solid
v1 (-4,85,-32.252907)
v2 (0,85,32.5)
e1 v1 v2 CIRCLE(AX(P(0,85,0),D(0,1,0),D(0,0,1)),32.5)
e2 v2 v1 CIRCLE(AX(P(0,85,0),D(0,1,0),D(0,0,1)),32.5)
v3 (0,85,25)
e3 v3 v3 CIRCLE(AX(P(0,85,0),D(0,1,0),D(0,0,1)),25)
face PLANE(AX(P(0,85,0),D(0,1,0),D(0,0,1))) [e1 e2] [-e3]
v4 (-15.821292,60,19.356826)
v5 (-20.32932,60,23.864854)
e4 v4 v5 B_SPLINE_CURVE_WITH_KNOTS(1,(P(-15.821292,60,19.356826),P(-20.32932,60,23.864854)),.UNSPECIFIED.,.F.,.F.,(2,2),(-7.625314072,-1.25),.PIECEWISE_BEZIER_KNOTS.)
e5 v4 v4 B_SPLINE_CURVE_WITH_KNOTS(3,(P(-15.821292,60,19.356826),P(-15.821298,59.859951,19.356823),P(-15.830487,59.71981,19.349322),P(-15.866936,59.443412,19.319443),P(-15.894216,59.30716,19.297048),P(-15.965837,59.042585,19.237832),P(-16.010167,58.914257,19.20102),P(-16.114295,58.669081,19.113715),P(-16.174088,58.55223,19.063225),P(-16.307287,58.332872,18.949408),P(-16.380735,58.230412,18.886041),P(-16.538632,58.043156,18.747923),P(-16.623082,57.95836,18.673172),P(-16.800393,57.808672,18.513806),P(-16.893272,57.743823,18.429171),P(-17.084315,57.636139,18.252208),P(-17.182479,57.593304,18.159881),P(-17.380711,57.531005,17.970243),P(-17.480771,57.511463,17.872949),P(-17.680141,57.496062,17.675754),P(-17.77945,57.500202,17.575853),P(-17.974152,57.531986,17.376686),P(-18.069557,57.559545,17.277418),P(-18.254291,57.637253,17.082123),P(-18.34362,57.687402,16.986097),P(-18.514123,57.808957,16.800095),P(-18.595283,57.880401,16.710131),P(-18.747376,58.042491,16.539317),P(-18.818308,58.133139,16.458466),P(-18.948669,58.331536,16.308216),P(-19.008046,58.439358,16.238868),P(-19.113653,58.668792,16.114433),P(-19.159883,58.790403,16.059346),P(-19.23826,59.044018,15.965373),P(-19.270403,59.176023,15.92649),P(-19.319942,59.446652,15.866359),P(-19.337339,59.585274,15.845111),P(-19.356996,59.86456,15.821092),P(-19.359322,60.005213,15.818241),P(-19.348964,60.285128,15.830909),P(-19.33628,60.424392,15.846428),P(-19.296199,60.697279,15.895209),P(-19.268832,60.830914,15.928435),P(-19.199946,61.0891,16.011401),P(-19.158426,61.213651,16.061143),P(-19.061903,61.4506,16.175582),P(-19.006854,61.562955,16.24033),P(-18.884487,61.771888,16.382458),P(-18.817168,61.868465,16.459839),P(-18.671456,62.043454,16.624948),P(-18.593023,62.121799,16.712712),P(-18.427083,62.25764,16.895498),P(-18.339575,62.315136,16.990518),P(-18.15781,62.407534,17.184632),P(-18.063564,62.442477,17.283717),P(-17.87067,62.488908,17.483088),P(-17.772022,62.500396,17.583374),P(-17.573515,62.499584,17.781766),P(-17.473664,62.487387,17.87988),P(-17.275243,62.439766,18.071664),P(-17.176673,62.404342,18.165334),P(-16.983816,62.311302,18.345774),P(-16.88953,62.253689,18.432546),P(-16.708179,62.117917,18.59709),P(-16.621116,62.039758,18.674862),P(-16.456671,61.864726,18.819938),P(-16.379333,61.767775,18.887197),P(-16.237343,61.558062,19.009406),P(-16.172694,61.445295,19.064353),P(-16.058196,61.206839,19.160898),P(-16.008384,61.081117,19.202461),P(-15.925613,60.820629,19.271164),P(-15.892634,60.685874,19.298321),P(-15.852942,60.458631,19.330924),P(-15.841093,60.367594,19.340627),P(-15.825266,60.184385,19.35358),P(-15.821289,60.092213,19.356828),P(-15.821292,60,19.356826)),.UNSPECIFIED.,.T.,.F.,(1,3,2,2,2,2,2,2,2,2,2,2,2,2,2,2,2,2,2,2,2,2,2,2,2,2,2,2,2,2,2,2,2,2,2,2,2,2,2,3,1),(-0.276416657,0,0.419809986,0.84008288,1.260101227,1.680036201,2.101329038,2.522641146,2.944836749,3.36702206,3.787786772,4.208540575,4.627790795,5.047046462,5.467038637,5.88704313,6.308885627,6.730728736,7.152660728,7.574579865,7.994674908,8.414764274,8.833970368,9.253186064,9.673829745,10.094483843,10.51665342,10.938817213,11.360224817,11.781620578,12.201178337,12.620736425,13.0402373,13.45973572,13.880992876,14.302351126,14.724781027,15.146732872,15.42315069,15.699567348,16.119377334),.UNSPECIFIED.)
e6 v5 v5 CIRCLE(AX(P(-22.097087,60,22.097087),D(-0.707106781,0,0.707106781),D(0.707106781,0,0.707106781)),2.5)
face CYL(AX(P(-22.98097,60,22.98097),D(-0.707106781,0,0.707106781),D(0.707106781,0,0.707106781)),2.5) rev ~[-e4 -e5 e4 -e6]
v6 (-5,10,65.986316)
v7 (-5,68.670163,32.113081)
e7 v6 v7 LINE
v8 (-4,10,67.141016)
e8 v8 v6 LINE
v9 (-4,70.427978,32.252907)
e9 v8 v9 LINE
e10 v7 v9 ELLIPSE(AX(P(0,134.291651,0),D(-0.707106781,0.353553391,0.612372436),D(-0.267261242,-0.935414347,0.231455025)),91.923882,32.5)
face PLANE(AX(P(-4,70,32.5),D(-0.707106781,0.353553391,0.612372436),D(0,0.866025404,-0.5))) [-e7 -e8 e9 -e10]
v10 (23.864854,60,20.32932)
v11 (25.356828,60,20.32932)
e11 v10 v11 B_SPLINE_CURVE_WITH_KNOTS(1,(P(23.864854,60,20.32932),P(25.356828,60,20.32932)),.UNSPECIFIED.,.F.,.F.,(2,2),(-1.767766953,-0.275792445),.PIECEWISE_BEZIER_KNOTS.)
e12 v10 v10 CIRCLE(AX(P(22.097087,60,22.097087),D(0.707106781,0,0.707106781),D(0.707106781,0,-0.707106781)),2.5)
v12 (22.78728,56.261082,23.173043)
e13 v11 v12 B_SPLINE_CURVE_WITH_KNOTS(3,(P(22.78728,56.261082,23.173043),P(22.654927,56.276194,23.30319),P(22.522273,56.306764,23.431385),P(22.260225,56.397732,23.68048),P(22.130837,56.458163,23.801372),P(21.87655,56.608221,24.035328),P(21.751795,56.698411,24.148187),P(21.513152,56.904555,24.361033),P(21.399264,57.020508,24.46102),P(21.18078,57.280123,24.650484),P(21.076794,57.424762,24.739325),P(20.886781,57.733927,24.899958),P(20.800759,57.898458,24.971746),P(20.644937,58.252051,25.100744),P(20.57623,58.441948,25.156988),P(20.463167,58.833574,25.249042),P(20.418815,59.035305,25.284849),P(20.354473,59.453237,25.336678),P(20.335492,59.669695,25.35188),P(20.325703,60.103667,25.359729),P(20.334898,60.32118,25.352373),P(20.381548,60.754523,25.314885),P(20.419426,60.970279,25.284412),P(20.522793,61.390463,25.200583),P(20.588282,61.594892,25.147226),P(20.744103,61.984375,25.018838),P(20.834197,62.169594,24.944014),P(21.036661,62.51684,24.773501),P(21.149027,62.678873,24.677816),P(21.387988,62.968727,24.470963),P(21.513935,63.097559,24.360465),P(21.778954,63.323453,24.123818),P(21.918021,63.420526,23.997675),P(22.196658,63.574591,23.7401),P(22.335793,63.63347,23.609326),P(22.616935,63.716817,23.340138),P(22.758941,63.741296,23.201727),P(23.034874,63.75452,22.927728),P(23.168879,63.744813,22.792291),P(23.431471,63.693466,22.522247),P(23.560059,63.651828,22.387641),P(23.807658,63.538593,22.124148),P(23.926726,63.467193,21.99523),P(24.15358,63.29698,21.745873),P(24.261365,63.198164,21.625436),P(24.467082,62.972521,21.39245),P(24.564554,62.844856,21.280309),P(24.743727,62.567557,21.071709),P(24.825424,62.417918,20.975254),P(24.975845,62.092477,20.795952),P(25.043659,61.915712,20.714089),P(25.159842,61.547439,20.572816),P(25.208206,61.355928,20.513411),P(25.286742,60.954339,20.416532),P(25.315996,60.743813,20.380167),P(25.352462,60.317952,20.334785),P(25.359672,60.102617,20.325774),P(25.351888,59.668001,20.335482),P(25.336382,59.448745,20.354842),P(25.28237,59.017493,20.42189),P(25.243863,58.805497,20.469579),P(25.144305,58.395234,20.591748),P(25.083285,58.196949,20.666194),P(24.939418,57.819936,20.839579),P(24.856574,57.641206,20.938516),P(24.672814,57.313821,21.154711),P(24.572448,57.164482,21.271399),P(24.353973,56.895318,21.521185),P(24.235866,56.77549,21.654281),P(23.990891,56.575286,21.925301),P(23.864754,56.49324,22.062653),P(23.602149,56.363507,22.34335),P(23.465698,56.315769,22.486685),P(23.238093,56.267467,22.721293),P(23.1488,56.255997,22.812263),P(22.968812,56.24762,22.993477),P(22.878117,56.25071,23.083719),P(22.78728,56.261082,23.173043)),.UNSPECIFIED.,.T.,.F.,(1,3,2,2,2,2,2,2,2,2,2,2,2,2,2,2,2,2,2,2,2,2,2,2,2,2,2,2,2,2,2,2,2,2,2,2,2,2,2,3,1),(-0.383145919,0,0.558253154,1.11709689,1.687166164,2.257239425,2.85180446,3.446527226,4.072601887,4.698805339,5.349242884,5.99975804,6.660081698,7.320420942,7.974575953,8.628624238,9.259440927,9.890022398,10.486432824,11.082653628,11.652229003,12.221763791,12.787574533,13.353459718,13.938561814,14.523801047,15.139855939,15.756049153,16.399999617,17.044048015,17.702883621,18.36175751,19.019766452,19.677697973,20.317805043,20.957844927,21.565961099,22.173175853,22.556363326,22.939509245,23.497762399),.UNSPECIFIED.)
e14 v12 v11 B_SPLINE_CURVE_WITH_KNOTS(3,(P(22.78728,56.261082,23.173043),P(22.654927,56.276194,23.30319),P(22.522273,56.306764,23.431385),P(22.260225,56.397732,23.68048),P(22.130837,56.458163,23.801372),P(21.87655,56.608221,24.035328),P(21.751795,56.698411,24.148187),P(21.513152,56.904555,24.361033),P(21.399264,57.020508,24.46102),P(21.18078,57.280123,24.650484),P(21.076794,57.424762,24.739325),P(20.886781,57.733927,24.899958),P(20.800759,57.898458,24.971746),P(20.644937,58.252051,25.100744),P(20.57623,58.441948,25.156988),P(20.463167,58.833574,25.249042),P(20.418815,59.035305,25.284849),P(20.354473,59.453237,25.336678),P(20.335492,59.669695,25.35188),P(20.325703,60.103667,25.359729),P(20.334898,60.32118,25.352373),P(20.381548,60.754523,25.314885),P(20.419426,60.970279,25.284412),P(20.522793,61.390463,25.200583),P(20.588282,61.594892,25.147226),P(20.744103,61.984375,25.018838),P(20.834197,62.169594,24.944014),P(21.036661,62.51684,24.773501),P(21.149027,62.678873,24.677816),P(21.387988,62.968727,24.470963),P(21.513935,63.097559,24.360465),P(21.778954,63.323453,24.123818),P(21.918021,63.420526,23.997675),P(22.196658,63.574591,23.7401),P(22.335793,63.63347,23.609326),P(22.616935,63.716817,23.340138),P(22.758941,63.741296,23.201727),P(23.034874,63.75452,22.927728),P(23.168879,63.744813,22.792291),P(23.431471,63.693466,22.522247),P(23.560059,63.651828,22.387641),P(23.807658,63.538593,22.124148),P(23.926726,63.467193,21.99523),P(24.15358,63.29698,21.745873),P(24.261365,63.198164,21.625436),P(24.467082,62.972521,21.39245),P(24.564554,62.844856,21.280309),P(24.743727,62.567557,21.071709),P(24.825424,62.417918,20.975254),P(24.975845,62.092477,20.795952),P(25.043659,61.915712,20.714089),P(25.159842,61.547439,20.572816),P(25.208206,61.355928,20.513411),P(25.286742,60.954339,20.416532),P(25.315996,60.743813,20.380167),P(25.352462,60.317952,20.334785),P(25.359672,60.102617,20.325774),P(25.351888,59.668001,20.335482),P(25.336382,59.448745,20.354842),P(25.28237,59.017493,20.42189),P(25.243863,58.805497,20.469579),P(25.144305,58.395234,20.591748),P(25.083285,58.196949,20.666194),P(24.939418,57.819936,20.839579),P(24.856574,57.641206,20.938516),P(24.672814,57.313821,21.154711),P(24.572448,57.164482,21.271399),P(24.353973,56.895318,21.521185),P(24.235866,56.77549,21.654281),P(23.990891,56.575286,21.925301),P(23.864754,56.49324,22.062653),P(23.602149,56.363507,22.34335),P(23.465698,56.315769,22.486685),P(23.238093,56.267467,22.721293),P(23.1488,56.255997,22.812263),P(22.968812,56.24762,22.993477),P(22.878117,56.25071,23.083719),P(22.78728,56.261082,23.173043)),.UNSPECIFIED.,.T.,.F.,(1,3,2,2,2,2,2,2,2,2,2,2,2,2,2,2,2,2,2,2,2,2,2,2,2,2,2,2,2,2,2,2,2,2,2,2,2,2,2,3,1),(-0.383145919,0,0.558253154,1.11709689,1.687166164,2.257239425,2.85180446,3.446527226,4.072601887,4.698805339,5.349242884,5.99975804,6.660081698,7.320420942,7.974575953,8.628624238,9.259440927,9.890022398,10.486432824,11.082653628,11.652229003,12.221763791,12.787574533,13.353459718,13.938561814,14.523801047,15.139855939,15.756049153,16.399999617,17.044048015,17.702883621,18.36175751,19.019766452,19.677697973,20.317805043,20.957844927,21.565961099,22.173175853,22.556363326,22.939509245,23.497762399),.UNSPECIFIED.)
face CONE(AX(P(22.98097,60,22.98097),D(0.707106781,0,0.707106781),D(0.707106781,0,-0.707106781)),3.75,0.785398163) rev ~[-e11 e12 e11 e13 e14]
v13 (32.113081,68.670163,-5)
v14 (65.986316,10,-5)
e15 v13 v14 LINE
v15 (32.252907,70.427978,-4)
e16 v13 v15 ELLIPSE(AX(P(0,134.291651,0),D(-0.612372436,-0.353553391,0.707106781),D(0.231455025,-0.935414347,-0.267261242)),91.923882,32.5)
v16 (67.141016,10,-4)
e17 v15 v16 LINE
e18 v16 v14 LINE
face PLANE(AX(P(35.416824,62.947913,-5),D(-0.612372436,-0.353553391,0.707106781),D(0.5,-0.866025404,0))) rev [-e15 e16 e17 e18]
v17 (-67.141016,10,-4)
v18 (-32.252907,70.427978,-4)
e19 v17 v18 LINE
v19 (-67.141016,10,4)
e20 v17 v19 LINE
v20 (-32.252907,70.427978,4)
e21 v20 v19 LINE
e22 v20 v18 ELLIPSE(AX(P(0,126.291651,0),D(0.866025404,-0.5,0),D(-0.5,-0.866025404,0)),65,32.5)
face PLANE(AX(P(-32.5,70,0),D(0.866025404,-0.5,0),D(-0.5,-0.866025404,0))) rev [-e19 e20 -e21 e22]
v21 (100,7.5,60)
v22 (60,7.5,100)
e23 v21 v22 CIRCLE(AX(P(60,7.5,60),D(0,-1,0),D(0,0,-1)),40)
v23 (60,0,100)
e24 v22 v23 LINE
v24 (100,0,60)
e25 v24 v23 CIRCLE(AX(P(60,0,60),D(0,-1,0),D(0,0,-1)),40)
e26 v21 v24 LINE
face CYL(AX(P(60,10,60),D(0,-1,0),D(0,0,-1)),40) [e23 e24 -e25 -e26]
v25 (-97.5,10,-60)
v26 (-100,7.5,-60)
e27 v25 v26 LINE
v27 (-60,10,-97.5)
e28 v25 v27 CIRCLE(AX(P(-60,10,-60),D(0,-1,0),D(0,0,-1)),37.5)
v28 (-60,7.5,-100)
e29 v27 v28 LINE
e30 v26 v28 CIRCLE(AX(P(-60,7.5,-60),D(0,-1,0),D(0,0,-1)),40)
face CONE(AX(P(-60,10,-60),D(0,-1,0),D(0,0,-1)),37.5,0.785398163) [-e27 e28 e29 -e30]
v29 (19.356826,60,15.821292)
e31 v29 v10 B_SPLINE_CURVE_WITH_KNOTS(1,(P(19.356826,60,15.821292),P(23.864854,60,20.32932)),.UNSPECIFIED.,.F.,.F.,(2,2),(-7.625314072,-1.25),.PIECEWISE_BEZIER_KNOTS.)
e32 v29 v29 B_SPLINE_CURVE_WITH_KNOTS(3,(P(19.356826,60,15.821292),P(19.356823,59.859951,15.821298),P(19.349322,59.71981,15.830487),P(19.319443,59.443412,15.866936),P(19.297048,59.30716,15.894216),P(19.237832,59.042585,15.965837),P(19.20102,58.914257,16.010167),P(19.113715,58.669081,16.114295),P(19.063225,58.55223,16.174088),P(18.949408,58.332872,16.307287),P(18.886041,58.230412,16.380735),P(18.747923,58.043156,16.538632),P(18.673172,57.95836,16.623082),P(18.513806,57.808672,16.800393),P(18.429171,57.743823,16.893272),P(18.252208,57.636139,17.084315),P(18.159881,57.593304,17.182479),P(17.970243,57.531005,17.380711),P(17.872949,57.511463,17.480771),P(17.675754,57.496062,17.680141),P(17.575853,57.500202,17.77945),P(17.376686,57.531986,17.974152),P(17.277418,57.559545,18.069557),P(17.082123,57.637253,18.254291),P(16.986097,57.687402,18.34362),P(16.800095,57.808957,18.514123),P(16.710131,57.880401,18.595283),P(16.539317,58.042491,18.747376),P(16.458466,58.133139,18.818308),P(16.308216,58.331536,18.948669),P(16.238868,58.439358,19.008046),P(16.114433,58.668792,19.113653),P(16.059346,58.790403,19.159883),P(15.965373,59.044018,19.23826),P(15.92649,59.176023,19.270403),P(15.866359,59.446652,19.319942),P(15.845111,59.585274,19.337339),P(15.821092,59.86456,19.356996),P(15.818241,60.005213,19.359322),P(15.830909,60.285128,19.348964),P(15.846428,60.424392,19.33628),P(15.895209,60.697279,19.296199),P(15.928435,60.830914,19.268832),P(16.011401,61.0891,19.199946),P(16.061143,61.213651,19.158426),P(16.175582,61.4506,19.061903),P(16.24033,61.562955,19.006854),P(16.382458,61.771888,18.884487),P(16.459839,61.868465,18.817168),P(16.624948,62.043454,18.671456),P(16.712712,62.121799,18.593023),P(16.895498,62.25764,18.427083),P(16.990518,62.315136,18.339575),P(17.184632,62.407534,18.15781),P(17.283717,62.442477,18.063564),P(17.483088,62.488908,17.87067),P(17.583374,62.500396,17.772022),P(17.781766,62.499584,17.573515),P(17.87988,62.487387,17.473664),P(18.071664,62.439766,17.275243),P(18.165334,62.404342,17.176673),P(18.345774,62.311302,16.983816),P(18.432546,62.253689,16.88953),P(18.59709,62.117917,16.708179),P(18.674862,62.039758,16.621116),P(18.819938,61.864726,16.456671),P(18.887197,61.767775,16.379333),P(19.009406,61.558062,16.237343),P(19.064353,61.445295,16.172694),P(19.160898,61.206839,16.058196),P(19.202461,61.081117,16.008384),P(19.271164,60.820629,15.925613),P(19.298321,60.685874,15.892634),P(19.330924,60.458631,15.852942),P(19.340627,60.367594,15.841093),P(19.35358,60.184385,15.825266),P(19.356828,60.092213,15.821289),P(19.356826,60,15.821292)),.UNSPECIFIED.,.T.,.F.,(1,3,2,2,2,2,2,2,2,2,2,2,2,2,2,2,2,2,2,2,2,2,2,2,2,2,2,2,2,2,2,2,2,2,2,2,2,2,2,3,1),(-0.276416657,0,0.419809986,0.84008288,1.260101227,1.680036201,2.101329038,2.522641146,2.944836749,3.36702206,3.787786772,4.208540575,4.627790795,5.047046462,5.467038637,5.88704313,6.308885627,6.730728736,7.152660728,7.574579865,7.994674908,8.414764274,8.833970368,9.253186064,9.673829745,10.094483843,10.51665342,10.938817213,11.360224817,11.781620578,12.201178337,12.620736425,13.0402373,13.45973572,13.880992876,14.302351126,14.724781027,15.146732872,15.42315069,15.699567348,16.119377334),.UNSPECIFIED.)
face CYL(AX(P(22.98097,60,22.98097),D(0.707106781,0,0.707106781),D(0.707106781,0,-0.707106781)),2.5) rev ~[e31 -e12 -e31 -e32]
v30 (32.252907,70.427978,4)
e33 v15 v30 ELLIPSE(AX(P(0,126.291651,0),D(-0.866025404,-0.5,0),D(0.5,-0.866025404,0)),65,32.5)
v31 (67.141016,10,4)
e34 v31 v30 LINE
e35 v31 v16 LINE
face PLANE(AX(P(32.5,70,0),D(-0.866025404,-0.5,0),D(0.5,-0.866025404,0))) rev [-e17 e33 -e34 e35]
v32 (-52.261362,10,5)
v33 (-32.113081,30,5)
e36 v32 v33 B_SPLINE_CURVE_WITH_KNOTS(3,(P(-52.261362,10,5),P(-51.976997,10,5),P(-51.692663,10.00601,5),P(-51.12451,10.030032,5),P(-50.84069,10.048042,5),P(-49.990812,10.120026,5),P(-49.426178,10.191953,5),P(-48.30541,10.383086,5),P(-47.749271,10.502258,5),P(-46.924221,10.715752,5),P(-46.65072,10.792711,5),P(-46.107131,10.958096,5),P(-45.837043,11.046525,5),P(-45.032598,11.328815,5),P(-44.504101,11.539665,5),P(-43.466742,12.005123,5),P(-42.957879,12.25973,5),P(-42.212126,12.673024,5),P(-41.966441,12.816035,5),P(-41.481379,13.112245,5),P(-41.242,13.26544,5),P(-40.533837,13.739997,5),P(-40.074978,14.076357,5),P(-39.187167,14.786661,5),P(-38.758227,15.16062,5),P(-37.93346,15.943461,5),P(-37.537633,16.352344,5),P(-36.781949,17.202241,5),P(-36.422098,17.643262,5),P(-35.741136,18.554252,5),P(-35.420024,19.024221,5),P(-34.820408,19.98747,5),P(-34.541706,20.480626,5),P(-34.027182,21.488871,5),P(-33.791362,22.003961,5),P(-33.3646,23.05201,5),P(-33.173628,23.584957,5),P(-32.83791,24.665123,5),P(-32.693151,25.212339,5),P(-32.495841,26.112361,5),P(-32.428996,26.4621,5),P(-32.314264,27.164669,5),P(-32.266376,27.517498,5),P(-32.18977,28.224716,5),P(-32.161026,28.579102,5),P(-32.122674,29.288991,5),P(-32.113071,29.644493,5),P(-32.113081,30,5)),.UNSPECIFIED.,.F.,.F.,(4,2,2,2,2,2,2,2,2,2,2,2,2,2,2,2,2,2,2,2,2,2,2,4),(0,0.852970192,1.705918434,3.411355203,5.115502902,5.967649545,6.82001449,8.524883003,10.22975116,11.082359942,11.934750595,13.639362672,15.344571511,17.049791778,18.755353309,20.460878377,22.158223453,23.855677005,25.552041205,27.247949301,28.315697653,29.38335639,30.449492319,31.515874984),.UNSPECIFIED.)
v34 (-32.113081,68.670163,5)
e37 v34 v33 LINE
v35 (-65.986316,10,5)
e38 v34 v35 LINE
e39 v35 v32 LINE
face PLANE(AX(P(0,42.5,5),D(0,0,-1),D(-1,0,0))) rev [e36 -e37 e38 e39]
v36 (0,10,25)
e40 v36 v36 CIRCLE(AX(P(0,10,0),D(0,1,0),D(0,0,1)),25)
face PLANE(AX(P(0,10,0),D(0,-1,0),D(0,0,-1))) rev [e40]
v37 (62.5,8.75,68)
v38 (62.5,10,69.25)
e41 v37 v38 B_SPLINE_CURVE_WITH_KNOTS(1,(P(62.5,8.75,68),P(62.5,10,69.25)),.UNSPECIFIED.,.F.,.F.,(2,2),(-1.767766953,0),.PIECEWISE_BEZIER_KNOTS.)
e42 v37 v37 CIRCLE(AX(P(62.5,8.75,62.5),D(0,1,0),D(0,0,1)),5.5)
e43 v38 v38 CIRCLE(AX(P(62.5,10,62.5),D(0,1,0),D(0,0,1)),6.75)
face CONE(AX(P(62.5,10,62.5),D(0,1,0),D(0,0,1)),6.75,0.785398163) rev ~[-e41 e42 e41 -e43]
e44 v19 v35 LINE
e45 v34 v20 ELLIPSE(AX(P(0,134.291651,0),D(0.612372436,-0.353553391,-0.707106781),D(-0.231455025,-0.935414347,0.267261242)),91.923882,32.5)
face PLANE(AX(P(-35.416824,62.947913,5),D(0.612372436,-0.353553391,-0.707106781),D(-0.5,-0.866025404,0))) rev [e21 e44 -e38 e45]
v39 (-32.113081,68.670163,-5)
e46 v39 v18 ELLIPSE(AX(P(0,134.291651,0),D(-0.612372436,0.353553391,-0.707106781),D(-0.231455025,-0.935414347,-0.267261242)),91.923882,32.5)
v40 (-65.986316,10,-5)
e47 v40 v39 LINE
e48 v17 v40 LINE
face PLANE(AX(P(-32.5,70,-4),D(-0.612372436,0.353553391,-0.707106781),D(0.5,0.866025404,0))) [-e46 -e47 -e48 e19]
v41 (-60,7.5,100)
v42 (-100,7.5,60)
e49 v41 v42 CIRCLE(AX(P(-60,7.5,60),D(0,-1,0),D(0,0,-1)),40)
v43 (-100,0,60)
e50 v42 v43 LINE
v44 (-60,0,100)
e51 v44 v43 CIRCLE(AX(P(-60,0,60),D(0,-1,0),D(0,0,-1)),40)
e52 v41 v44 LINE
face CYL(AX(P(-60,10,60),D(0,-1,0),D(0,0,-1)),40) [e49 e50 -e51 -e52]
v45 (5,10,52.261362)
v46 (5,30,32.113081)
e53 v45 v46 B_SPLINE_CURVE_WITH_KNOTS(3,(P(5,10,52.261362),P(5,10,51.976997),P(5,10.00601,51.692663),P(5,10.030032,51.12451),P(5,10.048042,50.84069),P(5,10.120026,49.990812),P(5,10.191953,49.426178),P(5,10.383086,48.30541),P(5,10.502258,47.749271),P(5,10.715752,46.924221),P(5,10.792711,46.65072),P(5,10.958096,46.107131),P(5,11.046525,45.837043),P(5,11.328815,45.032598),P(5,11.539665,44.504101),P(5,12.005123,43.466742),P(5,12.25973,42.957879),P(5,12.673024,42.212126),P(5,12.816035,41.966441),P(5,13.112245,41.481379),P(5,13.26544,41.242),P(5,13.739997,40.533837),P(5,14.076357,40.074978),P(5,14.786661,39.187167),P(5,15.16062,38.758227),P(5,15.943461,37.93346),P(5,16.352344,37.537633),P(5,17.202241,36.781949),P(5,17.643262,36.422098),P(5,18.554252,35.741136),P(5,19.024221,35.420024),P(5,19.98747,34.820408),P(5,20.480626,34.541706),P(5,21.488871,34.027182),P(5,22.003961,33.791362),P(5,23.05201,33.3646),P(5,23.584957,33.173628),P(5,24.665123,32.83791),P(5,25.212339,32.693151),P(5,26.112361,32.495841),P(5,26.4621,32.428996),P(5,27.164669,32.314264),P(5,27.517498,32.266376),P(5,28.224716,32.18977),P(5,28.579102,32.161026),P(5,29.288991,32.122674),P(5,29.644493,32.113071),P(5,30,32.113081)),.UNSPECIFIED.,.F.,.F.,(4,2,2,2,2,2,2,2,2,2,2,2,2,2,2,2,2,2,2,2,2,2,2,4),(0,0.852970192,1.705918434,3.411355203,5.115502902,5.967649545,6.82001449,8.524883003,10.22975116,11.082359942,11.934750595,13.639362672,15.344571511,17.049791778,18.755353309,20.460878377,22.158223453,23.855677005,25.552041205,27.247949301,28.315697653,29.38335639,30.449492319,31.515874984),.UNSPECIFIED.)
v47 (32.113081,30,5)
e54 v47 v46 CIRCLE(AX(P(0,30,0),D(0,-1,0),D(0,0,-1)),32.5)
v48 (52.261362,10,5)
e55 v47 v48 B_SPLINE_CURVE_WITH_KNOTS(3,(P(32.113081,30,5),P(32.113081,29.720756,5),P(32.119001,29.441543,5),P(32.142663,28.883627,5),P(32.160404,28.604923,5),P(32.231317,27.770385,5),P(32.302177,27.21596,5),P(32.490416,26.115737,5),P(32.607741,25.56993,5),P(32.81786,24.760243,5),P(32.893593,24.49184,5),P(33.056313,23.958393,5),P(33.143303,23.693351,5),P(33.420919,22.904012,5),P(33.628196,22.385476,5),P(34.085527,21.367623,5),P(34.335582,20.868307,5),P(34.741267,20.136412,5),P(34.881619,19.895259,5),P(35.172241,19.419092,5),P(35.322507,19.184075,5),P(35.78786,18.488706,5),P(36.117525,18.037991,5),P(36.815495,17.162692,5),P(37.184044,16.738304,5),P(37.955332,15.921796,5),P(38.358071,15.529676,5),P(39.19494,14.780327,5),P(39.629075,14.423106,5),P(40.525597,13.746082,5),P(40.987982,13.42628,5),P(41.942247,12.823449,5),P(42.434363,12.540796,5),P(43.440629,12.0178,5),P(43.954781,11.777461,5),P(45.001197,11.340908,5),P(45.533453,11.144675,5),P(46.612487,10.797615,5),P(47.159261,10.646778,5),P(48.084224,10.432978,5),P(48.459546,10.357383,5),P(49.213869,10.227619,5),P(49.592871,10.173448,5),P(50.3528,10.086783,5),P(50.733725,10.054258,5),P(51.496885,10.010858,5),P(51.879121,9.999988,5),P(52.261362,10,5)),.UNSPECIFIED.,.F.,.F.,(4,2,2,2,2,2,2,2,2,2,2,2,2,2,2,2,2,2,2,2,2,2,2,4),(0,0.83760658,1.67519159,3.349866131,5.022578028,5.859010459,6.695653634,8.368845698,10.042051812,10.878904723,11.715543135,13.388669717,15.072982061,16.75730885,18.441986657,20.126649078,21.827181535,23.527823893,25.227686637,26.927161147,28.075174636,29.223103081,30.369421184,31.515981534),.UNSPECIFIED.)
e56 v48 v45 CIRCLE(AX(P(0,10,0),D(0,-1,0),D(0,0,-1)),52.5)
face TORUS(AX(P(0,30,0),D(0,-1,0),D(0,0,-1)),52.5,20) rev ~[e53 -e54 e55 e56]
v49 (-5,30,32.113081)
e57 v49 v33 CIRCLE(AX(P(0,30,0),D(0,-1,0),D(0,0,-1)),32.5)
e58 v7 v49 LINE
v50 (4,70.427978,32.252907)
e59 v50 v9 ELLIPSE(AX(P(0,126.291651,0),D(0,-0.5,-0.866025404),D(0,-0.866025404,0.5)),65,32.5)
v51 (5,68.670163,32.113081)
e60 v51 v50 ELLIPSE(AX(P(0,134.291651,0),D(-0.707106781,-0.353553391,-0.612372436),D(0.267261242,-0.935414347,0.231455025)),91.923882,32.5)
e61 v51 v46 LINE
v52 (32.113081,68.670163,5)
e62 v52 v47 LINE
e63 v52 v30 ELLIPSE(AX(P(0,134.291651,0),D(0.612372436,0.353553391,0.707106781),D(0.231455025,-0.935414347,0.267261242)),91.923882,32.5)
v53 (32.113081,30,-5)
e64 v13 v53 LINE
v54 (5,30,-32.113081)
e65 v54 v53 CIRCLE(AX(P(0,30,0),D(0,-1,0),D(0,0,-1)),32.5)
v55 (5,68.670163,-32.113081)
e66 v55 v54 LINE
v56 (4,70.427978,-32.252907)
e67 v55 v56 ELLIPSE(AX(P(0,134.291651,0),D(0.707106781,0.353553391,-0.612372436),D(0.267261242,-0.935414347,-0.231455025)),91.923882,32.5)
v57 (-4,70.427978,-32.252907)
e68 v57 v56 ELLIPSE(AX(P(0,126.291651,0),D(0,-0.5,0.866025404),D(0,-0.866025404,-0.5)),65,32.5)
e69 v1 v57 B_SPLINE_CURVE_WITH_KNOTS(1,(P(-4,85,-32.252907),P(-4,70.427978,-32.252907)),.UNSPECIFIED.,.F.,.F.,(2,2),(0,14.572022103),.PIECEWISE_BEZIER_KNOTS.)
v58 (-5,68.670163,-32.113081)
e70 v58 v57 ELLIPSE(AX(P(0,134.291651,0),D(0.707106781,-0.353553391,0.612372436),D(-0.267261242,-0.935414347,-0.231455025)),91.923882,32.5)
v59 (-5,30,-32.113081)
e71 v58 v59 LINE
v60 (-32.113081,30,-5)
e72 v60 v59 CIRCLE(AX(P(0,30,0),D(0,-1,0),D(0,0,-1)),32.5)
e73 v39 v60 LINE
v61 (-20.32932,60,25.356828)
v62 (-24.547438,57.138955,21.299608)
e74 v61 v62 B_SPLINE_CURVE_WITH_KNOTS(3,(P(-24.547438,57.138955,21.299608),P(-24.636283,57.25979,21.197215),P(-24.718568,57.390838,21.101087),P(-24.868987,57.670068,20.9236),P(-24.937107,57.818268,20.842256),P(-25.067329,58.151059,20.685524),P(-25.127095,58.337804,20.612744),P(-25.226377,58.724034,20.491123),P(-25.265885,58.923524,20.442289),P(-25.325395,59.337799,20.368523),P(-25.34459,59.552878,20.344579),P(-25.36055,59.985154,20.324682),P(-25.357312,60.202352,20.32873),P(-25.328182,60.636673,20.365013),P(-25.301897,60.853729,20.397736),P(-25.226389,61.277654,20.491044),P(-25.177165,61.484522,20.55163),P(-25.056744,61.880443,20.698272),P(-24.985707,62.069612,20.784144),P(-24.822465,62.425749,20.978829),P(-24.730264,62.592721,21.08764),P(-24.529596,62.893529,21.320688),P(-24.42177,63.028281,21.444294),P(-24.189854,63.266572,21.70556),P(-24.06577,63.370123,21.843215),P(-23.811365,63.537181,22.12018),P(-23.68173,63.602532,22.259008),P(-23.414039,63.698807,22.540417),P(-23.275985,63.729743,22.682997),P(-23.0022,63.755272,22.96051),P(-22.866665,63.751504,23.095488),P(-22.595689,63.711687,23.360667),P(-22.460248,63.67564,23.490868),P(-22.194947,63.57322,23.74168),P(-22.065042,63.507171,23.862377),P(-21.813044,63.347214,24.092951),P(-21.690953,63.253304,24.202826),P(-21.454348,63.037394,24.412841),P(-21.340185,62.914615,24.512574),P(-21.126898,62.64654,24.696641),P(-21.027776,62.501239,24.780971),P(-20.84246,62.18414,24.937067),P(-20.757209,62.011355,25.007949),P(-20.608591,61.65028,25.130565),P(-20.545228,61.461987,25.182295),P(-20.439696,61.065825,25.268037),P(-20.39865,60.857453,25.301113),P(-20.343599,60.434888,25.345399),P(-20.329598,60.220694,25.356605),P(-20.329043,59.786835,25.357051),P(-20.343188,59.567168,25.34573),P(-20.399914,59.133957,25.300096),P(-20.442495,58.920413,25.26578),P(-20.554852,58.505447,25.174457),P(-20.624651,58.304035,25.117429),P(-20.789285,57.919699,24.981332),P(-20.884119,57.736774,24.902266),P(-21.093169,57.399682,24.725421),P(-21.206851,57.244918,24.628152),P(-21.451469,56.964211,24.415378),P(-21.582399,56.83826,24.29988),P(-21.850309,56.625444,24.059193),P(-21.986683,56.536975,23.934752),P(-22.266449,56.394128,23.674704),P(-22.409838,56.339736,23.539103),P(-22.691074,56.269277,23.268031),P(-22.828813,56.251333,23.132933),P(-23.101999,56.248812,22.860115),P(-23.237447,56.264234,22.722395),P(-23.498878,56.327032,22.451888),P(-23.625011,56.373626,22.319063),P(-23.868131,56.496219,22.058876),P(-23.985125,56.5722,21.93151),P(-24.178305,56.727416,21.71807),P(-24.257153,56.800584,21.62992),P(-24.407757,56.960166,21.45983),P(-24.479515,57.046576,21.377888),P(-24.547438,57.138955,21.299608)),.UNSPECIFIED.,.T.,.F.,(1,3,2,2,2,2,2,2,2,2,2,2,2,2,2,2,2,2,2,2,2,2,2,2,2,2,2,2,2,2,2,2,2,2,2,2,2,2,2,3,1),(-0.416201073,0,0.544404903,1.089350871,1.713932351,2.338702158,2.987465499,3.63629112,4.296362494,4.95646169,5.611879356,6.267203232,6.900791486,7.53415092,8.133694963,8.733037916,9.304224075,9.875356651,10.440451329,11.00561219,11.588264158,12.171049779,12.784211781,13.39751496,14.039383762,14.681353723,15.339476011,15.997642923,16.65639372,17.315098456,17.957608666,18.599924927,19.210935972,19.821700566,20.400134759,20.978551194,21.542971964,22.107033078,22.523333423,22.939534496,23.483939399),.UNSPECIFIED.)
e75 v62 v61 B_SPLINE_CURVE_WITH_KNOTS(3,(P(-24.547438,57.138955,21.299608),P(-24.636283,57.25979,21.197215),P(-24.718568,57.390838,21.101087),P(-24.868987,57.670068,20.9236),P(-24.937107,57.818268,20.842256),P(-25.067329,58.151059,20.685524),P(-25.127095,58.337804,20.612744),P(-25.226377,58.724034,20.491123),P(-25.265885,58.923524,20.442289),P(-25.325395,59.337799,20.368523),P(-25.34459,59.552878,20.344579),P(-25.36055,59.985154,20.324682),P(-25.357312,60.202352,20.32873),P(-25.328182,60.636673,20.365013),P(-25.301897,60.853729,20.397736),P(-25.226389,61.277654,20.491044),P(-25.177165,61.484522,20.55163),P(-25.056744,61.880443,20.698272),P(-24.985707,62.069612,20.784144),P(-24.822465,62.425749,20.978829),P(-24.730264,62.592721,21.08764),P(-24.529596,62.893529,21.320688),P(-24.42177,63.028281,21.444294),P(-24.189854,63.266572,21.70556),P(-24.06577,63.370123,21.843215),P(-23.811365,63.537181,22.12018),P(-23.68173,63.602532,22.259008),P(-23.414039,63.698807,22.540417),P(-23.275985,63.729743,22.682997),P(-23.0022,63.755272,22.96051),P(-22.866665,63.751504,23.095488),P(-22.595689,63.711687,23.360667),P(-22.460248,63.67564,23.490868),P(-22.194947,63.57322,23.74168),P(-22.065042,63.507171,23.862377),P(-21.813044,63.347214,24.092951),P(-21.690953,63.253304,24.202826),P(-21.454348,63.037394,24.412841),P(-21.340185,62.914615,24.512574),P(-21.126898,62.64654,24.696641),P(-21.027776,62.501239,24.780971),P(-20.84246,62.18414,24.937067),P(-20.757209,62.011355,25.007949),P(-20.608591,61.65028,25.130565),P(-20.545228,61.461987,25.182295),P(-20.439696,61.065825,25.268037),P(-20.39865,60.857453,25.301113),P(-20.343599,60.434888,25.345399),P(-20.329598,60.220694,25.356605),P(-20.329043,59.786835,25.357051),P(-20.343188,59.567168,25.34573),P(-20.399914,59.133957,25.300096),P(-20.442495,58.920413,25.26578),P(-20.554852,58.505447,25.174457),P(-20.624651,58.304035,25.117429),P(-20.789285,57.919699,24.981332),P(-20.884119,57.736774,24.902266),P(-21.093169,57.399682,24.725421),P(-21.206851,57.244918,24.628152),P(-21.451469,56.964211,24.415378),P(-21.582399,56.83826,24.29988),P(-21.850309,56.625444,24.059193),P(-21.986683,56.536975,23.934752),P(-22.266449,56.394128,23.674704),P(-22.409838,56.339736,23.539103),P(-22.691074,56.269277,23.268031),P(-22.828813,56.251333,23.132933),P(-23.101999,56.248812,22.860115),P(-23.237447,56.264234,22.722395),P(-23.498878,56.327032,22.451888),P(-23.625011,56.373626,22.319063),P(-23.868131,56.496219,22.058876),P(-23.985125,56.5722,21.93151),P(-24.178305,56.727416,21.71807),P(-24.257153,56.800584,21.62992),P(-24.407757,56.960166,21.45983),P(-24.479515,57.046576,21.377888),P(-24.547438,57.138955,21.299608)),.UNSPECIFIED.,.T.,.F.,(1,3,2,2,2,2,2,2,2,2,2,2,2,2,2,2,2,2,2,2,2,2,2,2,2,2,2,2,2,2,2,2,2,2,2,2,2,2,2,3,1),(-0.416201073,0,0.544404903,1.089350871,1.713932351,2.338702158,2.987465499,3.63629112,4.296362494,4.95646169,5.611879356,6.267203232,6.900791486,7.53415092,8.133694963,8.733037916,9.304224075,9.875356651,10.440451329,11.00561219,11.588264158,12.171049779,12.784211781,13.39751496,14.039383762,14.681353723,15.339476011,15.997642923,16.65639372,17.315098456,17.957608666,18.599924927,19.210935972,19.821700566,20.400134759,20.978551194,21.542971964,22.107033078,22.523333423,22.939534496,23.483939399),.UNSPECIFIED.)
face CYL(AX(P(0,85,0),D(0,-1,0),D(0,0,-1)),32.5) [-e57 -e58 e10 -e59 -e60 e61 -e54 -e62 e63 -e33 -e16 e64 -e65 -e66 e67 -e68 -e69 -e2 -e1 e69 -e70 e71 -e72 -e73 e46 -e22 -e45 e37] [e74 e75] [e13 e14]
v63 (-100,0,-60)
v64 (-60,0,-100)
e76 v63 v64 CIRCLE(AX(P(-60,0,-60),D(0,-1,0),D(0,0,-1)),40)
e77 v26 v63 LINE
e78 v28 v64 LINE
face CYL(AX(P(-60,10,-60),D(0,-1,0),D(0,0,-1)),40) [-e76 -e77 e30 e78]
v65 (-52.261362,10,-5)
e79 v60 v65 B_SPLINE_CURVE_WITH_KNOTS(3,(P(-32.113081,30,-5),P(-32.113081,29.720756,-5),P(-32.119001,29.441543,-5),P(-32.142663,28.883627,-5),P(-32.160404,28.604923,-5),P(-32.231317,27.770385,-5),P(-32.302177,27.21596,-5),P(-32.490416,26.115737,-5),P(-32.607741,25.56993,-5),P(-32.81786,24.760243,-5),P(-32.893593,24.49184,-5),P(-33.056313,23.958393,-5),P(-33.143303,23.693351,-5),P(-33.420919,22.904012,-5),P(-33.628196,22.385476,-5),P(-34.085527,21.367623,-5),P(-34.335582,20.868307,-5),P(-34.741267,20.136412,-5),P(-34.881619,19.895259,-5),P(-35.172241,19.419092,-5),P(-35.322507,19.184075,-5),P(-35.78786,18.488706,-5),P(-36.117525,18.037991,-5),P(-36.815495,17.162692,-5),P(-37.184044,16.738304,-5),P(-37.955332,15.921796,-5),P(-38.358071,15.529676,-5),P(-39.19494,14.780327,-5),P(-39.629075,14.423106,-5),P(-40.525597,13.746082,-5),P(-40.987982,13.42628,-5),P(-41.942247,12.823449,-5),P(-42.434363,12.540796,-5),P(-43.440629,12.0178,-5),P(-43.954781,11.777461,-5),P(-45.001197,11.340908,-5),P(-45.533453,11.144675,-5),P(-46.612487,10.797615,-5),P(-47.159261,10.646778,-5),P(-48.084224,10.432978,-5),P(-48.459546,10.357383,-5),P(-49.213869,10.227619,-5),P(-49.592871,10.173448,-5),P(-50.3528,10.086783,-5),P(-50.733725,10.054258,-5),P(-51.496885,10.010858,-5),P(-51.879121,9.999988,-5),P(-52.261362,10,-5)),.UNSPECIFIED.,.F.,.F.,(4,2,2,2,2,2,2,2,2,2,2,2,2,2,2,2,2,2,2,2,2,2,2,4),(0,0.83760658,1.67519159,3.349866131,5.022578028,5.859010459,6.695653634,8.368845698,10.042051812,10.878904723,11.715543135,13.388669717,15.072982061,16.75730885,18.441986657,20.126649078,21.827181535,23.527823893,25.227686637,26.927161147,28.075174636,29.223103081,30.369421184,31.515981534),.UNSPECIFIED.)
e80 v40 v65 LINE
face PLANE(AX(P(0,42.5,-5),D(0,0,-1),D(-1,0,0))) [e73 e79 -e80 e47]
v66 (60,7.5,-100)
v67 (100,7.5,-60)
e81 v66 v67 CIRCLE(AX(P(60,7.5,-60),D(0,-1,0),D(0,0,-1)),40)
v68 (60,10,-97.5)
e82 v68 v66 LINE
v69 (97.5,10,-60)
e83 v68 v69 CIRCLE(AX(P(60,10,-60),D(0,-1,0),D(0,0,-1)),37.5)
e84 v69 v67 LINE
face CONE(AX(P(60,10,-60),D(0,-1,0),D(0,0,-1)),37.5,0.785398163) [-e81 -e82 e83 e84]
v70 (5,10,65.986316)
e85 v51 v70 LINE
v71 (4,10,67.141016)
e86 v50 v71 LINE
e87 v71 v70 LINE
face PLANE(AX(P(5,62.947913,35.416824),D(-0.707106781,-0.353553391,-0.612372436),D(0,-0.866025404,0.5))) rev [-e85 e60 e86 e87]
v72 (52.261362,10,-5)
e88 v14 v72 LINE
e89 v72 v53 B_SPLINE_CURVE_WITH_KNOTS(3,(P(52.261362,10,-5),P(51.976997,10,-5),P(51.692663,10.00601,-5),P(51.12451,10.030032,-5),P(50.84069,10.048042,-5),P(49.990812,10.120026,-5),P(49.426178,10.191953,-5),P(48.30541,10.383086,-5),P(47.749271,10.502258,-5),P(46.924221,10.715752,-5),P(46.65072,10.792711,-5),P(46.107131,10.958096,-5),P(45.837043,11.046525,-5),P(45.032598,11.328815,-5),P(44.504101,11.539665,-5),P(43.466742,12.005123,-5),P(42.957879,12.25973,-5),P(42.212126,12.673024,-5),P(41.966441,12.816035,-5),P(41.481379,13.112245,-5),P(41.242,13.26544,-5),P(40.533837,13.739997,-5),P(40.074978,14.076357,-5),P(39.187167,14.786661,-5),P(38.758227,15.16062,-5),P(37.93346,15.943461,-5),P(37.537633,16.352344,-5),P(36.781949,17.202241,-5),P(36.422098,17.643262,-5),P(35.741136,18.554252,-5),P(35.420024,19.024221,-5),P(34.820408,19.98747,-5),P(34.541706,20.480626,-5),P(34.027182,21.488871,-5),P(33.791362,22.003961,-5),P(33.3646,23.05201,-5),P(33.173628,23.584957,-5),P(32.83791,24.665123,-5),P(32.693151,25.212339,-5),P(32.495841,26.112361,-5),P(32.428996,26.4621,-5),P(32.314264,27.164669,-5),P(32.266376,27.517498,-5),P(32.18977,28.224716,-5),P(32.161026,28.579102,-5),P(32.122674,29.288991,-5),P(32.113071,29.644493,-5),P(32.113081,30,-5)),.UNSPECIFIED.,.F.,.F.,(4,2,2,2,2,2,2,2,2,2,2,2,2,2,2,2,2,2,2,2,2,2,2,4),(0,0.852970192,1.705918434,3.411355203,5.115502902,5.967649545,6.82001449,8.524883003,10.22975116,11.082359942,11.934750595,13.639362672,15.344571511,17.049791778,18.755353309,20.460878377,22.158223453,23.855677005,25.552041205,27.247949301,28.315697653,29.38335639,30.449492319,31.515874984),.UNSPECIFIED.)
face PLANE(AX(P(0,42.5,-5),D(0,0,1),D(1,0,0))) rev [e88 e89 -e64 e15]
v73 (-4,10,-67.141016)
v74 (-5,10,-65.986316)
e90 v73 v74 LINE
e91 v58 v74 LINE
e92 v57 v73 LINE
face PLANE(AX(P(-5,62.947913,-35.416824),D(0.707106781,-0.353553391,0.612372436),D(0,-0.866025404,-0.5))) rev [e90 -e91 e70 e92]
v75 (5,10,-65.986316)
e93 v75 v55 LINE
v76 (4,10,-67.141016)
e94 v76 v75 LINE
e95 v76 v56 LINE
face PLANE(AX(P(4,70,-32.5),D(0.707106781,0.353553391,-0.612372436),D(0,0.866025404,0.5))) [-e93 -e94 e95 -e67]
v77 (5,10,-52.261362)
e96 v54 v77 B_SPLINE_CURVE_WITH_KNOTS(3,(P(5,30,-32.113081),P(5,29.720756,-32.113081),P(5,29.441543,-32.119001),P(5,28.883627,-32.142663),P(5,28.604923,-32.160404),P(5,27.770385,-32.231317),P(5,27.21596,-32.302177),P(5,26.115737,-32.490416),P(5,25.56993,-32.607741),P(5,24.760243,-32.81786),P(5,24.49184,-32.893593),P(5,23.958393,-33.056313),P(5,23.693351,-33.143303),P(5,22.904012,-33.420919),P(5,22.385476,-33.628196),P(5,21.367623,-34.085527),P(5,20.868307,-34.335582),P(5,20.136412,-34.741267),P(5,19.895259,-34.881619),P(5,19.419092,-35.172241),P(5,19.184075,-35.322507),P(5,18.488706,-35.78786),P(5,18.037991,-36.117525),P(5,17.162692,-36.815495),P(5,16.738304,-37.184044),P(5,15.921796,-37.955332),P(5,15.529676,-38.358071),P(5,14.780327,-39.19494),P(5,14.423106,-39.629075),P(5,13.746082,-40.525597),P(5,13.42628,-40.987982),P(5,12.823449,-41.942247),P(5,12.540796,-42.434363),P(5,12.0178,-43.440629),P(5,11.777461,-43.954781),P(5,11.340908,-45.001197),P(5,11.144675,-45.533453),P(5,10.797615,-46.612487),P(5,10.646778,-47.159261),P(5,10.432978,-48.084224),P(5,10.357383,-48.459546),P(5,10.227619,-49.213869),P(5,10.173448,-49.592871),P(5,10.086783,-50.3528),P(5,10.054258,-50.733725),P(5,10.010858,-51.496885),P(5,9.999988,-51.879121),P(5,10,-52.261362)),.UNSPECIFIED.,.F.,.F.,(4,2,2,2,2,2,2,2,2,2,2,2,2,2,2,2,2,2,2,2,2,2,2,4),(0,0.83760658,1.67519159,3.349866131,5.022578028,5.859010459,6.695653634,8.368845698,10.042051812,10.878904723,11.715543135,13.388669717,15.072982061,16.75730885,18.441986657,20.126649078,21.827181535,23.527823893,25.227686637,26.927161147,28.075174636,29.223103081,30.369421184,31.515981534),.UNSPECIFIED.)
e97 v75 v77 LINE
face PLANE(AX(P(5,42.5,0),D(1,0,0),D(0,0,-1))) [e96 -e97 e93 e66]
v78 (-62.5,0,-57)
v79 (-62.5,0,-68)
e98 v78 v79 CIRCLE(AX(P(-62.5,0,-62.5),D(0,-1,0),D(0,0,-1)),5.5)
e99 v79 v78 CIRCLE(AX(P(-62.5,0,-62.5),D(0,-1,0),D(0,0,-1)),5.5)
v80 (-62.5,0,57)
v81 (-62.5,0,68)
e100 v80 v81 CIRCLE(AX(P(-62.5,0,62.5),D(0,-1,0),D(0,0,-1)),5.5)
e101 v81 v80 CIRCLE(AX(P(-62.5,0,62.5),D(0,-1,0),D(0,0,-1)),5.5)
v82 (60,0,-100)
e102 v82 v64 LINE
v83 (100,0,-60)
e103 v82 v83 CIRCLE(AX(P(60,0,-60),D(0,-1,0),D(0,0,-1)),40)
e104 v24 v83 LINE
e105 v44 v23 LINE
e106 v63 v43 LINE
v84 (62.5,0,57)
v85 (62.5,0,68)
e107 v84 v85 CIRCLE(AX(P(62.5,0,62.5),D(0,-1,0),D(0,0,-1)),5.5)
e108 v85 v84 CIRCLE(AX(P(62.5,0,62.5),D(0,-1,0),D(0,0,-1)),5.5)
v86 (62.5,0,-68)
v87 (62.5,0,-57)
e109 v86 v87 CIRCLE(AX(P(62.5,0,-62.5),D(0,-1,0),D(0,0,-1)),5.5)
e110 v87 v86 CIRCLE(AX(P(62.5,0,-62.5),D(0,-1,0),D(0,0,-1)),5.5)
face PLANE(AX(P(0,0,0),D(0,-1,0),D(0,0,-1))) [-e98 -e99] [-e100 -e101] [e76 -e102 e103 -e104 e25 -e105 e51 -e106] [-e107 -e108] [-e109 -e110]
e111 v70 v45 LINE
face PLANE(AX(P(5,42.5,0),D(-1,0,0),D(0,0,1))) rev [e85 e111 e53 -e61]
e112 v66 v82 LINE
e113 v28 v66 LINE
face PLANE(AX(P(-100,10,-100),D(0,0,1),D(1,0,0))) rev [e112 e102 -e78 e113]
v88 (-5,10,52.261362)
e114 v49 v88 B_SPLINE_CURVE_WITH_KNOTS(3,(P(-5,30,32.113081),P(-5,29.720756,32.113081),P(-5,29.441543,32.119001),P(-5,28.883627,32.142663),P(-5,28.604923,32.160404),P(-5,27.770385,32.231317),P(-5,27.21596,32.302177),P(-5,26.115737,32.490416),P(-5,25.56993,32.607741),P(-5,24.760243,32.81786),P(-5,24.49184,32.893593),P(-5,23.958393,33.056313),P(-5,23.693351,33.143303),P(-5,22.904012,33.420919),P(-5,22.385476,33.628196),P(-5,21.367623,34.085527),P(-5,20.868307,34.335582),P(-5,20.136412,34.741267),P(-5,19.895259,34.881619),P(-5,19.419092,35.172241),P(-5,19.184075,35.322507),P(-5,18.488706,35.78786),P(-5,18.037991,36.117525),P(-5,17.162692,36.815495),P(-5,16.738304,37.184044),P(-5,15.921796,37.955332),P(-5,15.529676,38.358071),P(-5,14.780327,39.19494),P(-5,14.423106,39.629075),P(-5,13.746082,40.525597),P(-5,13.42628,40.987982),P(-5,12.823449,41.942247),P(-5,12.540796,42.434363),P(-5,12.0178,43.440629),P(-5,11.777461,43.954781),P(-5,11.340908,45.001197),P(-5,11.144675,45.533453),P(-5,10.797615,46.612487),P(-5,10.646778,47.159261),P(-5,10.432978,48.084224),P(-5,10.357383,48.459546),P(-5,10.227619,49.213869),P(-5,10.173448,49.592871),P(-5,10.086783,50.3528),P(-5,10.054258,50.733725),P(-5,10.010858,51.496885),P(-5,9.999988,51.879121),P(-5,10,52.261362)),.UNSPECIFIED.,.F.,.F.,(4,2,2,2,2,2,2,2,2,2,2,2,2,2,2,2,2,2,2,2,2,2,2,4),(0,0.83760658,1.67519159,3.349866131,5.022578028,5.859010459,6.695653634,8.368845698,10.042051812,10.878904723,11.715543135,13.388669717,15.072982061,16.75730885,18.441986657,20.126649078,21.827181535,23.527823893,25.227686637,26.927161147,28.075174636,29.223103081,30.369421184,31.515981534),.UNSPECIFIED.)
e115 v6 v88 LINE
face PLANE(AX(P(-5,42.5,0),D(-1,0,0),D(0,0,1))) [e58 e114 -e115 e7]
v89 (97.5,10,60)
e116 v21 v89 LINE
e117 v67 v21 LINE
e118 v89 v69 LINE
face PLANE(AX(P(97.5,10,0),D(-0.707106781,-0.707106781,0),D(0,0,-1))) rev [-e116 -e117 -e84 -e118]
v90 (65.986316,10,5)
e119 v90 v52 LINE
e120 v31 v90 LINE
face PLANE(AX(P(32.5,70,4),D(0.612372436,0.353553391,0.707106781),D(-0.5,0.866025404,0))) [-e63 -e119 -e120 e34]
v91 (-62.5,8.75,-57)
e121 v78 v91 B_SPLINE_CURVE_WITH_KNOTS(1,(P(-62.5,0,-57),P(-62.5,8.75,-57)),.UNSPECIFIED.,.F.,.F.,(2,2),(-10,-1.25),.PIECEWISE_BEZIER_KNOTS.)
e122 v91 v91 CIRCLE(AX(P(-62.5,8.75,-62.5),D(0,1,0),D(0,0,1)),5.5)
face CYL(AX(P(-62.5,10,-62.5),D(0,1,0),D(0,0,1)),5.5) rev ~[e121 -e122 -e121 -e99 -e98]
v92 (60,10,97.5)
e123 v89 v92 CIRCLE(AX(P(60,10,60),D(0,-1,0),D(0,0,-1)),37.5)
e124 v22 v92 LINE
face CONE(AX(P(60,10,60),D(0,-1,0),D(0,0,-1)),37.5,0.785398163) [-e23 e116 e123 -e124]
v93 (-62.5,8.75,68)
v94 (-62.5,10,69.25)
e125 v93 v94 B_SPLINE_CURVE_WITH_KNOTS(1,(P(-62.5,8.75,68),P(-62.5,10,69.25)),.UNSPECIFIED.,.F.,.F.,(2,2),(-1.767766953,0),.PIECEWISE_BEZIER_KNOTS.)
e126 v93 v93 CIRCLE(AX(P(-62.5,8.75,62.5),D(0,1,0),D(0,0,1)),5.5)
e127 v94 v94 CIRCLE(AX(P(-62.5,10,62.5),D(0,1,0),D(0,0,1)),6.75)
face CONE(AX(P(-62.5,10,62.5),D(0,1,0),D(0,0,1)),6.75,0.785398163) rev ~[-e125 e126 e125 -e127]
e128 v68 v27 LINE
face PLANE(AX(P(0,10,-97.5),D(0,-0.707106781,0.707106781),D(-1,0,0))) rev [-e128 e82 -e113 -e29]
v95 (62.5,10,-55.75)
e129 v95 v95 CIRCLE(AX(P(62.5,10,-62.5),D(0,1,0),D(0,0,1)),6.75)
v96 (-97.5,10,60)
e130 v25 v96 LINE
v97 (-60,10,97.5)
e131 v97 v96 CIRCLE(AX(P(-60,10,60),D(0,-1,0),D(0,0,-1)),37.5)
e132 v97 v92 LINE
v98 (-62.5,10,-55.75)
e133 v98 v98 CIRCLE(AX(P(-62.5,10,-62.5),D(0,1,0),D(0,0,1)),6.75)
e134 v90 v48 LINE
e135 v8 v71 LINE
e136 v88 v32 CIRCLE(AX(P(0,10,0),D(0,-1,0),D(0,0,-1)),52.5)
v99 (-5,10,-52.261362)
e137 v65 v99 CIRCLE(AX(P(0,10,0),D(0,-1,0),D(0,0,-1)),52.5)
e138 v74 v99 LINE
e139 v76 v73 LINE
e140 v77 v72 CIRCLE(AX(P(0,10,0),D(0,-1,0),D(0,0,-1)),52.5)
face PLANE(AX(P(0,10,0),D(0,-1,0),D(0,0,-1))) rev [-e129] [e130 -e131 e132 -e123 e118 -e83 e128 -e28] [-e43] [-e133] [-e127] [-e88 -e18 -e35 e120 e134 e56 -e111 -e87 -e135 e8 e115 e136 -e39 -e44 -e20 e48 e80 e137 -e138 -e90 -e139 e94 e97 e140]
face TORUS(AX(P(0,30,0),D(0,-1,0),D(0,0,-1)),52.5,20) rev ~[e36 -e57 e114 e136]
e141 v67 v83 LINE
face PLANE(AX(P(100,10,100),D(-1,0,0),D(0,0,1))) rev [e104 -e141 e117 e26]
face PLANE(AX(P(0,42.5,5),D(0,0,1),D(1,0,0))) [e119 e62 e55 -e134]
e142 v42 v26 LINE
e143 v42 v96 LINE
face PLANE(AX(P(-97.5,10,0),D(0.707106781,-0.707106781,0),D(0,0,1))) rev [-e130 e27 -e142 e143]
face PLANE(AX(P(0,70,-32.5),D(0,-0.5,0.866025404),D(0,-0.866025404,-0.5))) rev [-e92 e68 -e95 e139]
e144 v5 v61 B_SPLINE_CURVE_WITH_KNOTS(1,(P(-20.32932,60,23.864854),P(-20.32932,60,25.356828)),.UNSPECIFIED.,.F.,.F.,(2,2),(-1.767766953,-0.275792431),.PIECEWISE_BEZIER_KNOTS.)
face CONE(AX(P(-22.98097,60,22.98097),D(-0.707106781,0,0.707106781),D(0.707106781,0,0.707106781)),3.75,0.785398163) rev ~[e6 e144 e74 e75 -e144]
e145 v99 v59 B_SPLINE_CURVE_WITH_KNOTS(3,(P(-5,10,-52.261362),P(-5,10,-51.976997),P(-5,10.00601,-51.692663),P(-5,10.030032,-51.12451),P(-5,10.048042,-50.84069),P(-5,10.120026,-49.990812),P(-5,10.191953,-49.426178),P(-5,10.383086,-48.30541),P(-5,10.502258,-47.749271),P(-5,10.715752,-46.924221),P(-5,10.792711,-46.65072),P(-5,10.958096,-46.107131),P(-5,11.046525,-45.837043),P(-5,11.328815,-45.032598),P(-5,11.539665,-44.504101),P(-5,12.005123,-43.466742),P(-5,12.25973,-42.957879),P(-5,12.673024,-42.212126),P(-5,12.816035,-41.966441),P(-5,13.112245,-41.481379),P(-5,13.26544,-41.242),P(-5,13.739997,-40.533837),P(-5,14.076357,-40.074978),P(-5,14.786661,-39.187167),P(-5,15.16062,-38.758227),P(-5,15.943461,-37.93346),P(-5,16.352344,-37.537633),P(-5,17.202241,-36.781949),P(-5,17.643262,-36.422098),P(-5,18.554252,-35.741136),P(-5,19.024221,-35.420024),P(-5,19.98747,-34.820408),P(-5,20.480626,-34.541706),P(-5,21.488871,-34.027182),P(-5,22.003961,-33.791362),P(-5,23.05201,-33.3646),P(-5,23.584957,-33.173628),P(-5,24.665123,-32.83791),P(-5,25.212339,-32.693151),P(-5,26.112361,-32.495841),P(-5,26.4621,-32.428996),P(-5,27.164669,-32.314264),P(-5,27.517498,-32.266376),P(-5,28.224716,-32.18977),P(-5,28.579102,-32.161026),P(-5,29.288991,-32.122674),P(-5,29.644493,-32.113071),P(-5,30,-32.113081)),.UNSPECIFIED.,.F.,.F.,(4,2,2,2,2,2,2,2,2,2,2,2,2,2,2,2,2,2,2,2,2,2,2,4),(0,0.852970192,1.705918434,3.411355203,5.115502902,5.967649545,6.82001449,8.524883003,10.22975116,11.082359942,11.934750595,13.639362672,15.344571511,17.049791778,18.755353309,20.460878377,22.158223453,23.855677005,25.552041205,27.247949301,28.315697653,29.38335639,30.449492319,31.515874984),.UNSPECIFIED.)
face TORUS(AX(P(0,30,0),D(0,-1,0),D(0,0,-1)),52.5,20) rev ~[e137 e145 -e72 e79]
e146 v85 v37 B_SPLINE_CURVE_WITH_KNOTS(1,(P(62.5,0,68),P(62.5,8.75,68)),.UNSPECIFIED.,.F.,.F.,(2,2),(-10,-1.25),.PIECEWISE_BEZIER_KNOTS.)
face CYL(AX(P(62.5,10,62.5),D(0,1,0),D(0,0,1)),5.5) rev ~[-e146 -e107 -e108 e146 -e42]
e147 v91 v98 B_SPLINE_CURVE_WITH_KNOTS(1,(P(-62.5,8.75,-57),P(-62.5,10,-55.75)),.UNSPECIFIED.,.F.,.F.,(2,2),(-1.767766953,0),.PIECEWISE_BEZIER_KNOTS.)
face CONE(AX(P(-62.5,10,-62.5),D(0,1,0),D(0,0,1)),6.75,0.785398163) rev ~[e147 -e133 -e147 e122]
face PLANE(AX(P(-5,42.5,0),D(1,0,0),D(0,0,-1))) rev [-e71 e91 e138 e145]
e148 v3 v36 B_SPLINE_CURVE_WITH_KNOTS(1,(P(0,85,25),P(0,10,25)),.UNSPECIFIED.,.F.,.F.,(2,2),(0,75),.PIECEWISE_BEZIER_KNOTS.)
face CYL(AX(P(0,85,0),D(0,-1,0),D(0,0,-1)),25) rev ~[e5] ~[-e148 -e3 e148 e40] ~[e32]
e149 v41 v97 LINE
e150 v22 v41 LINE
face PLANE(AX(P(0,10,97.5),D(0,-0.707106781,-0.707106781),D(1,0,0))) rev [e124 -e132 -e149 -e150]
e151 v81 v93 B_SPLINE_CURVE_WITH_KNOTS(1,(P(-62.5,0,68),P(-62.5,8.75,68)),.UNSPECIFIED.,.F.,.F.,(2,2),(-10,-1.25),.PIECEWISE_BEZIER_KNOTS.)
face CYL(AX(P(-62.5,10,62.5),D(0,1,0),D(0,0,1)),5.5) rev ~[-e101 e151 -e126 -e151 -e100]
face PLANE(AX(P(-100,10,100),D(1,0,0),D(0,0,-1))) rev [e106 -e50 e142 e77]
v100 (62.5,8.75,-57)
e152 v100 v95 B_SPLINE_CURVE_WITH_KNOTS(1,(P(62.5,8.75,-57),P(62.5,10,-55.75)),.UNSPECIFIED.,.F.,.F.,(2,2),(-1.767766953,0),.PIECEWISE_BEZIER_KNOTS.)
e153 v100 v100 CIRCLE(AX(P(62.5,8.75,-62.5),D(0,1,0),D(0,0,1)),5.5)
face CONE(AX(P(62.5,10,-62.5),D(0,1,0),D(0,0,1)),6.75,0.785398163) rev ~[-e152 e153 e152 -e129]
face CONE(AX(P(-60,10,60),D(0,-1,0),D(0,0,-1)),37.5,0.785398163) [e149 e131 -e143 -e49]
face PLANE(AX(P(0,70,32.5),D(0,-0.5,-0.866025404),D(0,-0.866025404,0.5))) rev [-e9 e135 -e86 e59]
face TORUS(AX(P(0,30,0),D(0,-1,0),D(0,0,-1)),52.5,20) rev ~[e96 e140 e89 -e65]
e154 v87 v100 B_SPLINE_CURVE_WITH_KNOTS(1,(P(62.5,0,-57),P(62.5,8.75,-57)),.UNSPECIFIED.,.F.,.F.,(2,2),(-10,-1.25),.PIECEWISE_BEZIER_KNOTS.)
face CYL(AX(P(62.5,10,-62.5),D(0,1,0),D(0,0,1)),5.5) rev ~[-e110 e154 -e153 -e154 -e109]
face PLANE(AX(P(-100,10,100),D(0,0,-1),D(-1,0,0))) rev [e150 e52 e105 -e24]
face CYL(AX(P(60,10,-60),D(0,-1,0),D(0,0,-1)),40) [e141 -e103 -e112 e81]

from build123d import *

# Parameters (mm, degrees)
SKETCH1_W                  = 200
SKETCH1_H                  = 200
BOSS_EXTRUDE1_DEPTH        = 10
SKETCH2_R                  = 32.5
SKETCH2_R_2                = 25
BOSS_EXTRUDE2_DEPTH        = 75
RIB1_REACH                 = 167
SKETCH3_WALL_W             = 401.282032302
SKETCH3_WALL_H             = 10
CIRPATTERN1_COUNT          = 4
MOUNTING_HOLES_D           = 11
MOUNTING_HOLES_CSINK_D     = 13.5
MOUNTING_HOLES_CSINK_ANGLE = 90
FILLET1_R                  = 20
FILLET2_R                  = 40
CHAMFER1_SIZE              = 2.5
CHAMFER2_SIZE              = 1


# Read off the part's stored shape, not the designer's step: M6x1.0 Tapped Hole1, M6x1.0 Tapped Hole2
with BuildPart() as part:
    # Sketch1 → Boss-Extrude1 (new body)
    with BuildSketch(Plane(origin=(0, 0, 0), x_dir=(1, 0, 0), z_dir=(0, 1, 0))):
        Rectangle(SKETCH1_W, SKETCH1_H)
    extrude(amount=BOSS_EXTRUDE1_DEPTH)

    # Sketch2 → Boss-Extrude2 (add)
    with BuildSketch(Plane(origin=(0, 10, 0), x_dir=(1, 0, 0), z_dir=(0, 1, 0))):
        with Locations(Location((0, 0, 0), (0, 0, 90))):
            Circle(SKETCH2_R)
        with Locations(Location((0, 0, 0), (0, 0, 270))):
            Circle(SKETCH2_R_2, mode=Mode.SUBTRACT)
    extrude(amount=BOSS_EXTRUDE2_DEPTH)

    # Sketch3 wall → Rib1 (add, up to next)
    with BuildSketch(Plane(origin=(49.820508076, 40, 0), x_dir=(0.499999999996, -0.866025403787, 0), z_dir=(0.866025403787, 0.499999999996, 0)), mode=Mode.PRIVATE) as rib1_sk1:
        Rectangle(SKETCH3_WALL_W, SKETCH3_WALL_H)
    rib1_tool1 = extrude(rib1_sk1.sketch, amount=-RIB1_REACH, mode=Mode.PRIVATE) - part.part
    rib1 = rib1_tool1.solids().sort_by_distance((49.820508076, 40, 0))[0]
    add(rib1)

    # CirPattern1: Rib1 ×4 about axis
    cirpattern1_axis = Axis((0, 0, 0), (0, 1, 0))
    for i in range(1, CIRPATTERN1_COUNT):
        add(rib1.rotate(cirpattern1_axis, i * 360 / CIRPATTERN1_COUNT))

    # M6x1.0 Tapped Hole1 outline → M6x1.0 Tapped Hole1 (revolve, cut)
    with BuildSketch(Plane(origin=(0, 60, 0), x_dir=(0.707106781186546, 0, 0.707106781186549), z_dir=(0, 1, 0))):
        Polygon((0, -32.500112934), (3.750112934, -32.500112934), (2.5, -31.25), (2.5, -24.874618187), (0, -24.874618187), align=None)
    revolve(axis=Axis((0, 60, 0), (0.707106781186549, 0, -0.707106781186546)), mode=Mode.SUBTRACT)

    # M6x1.0 Tapped Hole2 outline → M6x1.0 Tapped Hole2 (revolve, cut)
    with BuildSketch(Plane(origin=(0, 60, 0), x_dir=(0.707106781186546, 0, -0.707106781186549), z_dir=(0, -1, 0))):
        Polygon((3.750104401, 32.500104401), (0, 32.500104401), (0, 24.874618187), (2.5, 24.874618187), (2.5, 31.25), align=None)
    revolve(axis=Axis((0, 60, 0), (0.707106781186549, 0, 0.707106781186546)), mode=Mode.SUBTRACT)

    # Mounting Holes (through all)
    with Locations(Plane(origin=(0, 10, 0), x_dir=(1, 0, 0), z_dir=(0, 1, 0))):
        with Locations((-62.5, 62.5), (62.5, 62.5), (62.5, -62.5), (-62.5, -62.5)):
            CounterSinkHole(MOUNTING_HOLES_D / 2, MOUNTING_HOLES_CSINK_D / 2, counter_sink_angle=MOUNTING_HOLES_CSINK_ANGLE)

    # Fillet1
    fillet1_edges = [part.edges().sort_by_distance(p)[0] for p in [
        (-22.980970389, 10, -22.980970389),
        (22.980970389, 10, -22.980970389),
        (22.980970389, 10, 22.980970389),
        (-22.980970389, 10, 22.980970389),
    ]]
    fillet(fillet1_edges, radius=FILLET1_R)

    # Fillet2
    fillet2_edges = [part.edges().sort_by_distance(p)[0] for p in [
        (100, 5, 100),
        (-100, 5, 100),
        (-100, 5, -100),
        (100, 5, -100),
    ]]
    fillet(fillet2_edges, radius=FILLET2_R)

    # Chamfer1
    chamfer1_edges = [part.edges().sort_by_distance(p)[0] for p in [
        (-100, 10, 0),
        (0, 10, -100),
        (0, 10, 100),
        (100, 10, 0),
        (-88.284271247, 10, 88.284271247),
        (88.284271247, 10, 88.284271247),
        (88.284271247, 10, -88.284271247),
        (-88.284271247, 10, -88.284271247),
    ]]
    chamfer(chamfer1_edges, length=CHAMFER1_SIZE)

    # Chamfer2
    chamfer2_edges = [part.edges().sort_by_distance(p)[0] for p in [
        (-49.627048799, 40.335081297, -5),
        (-49.627048799, 40.335081297, 5),
        (-5, 40.335081297, 49.627048799),
        (5, 40.335081297, 49.627048799),
        (49.627048799, 40.335081297, 5),
        (49.627048799, 40.335081297, -5),
        (-5, 40.335081297, -49.627048799),
        (5, 40.335081297, -49.627048799),
    ]]
    chamfer(chamfer2_edges, length=CHAMFER2_SIZE)


solid = part.part
